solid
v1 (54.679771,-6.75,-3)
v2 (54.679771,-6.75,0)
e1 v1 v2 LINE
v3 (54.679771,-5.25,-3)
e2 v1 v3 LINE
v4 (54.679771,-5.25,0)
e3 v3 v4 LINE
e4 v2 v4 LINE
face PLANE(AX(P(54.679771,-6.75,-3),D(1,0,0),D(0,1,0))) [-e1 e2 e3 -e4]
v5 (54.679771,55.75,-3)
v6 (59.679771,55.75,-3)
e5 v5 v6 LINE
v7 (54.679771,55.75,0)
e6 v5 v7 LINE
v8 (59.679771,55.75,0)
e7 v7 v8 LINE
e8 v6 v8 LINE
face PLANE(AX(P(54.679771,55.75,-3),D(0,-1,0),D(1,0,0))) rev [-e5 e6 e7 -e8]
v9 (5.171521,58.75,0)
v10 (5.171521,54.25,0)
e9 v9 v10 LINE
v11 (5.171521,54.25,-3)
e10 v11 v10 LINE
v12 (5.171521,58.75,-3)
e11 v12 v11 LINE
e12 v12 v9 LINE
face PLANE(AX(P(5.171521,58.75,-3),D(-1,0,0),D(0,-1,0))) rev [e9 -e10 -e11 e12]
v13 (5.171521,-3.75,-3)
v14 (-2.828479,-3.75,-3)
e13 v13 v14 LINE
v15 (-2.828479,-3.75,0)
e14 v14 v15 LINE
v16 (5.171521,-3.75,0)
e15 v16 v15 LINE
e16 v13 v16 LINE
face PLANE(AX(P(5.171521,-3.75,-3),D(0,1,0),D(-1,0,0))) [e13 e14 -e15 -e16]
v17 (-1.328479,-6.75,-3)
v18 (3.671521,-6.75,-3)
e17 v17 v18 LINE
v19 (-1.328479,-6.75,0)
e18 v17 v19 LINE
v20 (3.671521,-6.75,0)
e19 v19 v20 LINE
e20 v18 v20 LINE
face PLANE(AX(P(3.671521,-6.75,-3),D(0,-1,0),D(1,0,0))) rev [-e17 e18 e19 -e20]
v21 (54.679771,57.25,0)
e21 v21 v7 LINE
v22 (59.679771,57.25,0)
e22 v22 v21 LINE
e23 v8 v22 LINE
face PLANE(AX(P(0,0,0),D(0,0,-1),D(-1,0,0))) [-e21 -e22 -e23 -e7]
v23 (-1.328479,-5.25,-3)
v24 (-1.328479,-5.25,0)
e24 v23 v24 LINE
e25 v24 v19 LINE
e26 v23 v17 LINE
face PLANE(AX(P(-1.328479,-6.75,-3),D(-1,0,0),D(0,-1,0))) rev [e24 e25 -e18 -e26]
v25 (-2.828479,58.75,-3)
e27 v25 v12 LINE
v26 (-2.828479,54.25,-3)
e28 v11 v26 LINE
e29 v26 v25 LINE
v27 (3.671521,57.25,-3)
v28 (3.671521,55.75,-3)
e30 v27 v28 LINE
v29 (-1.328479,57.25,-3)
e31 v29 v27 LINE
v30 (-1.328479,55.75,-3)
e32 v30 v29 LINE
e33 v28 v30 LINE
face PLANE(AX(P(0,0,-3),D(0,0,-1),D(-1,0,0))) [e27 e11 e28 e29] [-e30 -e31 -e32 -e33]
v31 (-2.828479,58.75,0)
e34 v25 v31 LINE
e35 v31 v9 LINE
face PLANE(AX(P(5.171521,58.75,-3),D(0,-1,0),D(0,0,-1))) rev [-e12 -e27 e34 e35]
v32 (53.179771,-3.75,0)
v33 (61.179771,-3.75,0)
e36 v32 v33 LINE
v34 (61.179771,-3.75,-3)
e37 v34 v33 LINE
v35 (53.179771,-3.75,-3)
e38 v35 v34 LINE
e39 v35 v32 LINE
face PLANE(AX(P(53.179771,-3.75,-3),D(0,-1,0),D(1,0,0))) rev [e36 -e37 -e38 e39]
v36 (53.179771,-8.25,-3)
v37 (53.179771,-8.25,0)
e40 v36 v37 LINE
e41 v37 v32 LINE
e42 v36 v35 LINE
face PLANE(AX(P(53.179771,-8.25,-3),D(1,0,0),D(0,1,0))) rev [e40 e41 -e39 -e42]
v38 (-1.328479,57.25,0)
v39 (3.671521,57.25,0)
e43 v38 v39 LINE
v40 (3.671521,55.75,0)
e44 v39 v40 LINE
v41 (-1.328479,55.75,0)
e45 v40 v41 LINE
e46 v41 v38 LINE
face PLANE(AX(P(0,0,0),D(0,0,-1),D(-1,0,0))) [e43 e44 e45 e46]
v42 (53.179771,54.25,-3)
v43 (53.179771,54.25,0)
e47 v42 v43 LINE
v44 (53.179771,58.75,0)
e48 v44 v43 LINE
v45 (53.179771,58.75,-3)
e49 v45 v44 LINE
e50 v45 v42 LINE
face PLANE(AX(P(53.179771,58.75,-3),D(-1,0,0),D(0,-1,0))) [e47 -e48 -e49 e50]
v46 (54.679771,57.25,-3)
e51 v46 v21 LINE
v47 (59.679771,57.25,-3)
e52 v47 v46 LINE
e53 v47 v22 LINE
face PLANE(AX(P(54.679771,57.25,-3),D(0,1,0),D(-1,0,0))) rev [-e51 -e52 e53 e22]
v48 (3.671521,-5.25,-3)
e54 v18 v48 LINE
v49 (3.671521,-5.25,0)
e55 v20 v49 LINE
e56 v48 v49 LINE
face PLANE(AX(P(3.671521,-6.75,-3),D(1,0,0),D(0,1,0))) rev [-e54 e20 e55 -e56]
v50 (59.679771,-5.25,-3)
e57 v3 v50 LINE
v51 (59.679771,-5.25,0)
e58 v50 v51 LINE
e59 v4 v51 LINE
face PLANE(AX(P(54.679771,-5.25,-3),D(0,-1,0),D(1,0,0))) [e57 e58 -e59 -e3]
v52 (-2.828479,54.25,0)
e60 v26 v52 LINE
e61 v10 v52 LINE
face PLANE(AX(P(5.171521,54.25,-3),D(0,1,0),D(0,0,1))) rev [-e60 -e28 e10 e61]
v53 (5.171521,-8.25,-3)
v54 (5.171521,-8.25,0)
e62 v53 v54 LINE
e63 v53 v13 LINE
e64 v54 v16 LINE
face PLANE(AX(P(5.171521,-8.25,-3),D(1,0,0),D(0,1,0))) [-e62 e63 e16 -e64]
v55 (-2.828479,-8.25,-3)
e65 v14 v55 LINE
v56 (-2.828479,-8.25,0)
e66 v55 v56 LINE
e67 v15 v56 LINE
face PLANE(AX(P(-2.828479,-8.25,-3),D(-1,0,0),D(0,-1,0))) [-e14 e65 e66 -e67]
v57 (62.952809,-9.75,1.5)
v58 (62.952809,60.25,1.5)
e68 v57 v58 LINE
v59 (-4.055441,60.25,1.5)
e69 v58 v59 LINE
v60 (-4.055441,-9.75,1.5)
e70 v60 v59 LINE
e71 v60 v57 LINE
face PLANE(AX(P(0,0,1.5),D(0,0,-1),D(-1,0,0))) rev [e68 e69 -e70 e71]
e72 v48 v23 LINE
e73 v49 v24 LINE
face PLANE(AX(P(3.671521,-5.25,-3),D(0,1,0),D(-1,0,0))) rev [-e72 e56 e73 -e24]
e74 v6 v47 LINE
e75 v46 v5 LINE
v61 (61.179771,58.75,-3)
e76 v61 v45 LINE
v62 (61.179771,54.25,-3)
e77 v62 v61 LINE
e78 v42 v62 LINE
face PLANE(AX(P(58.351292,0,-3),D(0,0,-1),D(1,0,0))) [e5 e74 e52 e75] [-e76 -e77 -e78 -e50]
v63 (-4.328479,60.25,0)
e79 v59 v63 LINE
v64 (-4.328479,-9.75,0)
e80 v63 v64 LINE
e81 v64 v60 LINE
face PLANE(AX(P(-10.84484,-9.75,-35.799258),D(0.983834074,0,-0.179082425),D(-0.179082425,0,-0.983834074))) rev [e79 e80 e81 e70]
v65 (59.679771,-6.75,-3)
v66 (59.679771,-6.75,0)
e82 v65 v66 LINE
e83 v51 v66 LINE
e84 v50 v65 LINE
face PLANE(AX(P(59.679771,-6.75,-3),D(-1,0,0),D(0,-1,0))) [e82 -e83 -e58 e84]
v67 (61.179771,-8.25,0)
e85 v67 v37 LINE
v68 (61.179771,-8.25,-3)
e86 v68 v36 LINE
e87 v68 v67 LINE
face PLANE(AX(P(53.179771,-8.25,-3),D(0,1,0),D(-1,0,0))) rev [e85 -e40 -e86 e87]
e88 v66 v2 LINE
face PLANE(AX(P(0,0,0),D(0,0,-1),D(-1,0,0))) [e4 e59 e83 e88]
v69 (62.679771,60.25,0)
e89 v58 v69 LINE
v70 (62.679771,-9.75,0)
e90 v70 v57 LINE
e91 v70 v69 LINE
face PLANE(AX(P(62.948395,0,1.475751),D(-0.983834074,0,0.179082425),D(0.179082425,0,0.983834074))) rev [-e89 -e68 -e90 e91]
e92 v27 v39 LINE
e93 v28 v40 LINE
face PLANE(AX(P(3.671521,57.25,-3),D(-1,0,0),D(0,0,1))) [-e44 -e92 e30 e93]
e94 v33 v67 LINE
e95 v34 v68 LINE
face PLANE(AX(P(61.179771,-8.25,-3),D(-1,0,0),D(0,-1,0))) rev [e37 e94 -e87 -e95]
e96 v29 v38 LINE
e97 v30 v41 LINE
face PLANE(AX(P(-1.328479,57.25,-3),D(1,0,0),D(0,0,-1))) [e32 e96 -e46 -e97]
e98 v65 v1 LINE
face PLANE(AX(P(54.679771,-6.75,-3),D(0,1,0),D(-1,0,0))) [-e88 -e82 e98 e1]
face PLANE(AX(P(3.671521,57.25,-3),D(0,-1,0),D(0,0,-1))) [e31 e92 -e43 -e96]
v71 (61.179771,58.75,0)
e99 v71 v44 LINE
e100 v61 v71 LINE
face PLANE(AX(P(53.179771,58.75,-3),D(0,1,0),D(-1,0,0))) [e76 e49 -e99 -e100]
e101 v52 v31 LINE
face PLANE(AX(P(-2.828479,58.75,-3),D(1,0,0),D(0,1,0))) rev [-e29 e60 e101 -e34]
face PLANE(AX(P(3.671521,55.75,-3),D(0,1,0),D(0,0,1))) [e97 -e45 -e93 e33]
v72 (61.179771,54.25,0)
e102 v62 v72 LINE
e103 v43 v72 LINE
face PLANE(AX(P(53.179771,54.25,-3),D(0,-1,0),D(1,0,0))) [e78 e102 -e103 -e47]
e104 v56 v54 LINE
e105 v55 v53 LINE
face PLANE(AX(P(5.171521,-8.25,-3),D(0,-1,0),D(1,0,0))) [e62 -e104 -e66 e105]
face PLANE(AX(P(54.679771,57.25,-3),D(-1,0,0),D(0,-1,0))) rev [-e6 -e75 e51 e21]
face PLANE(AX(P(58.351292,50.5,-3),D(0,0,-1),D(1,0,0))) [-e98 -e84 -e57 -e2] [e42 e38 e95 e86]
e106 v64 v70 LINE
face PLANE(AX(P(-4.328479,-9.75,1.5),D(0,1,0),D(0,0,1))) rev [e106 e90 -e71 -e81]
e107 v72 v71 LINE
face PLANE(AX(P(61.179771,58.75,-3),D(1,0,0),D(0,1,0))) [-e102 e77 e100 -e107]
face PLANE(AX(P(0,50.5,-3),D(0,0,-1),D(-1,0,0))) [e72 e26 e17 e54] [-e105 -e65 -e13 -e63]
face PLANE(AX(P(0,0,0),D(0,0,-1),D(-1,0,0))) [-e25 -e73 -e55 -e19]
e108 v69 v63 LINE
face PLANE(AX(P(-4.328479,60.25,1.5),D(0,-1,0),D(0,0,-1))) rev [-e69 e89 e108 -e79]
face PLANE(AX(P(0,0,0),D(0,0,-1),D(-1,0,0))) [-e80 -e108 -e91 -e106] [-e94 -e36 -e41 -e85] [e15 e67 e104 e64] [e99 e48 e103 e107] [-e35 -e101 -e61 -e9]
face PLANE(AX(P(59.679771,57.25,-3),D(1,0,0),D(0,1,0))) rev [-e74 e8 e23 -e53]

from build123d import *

# Parameters (mm, degrees)
SKETCH1_W                 = 67.008250425
SKETCH1_H                 = 70
BOSS_EXTRUDE1_DEPTH       = 1.5
BOSS_EXTRUDE2_START       = -9.75
BOSS_EXTRUDE2_DEPTH       = 70
CUT_EXTRUDE1_START        = -6
CUT_EXTRUDE1_OUTLINE_W    = 73
CUT_EXTRUDE1_OUTLINE_H    = 4
CUT_EXTRUDE1_DEPTH        = 1.741494861
SKETCH4_W                 = 8
SKETCH4_H                 = 4.5
SKETCH4_W_2               = 5
SKETCH4_H_2               = 1.5
BOSS_EXTRUDE3_DEPTH       = 3
MIRROR2_COPY_1_SKETCH_W   = 8
MIRROR2_COPY_1_SKETCH_H   = 4.5
MIRROR2_COPY_1_SKETCH_W_2 = 5
MIRROR2_COPY_1_SKETCH_H_2 = 1.5
MIRROR2_COPY_1_DEPTH      = 3


with BuildPart() as part:
    # Sketch1 → Boss-Extrude1 (new body)
    with BuildSketch(Plane.XY):
        with Locations((29.175646202, 25.25)):
            Rectangle(SKETCH1_W, SKETCH1_H)
    extrude(amount=BOSS_EXTRUDE1_DEPTH)

    # Boss-Extrude2: read off the stored shape, not the designer's step
    # Boss-Extrude2 outline → Boss-Extrude2 (add)
    with BuildSketch(Plane(origin=(0, 0, 0), x_dir=(1, 0, 0), z_dir=(0, 1, 0)).offset(BOSS_EXTRUDE2_START)):
        Polygon((62.952808957, -1.5), (62.679771414, 0), (62.679771414, -1.5), align=None)
    extrude(amount=BOSS_EXTRUDE2_DEPTH)

    # Cut-Extrude1: read off the stored shape, not the designer's step
    # Cut-Extrude1 outline → Cut-Extrude1 (cut)
    with BuildSketch(Plane(origin=(0, 0, 0), x_dir=(0, 1, 0), z_dir=(0.9838340738940914, 0, -0.17908242528220206)).offset(CUT_EXTRUDE1_START)):
        with Locations((25.5, 0)):
            Rectangle(CUT_EXTRUDE1_OUTLINE_W, CUT_EXTRUDE1_OUTLINE_H)
    extrude(amount=CUT_EXTRUDE1_DEPTH, mode=Mode.SUBTRACT)

    # Sketch4 → Boss-Extrude3 (add)
    with BuildSketch(Plane(origin=(0, 0, 0), x_dir=(-1, 0, 0), z_dir=(0, 0, -1))):
        with Locations((-1.171520989, 56.5)):
            Rectangle(SKETCH4_W, SKETCH4_H)
        with Locations((-1.171520989, 56.5)):
            Rectangle(SKETCH4_W_2, SKETCH4_H_2, mode=Mode.SUBTRACT)
    boss_extrude3 = extrude(amount=BOSS_EXTRUDE3_DEPTH)

    # Mirror1: Boss-Extrude3 across plane
    add(boss_extrude3.mirror(Plane(origin=(29.175646202, 0, 0), x_dir=(0, 0, 1), z_dir=(1, 0, 0))))

    # Mirror2: Boss-Extrude3 across plane
    add(boss_extrude3.mirror(Plane(origin=(0, 25.25, 0), x_dir=(0, 0, 1), z_dir=(0, -1, 0))))

    # Mirror2 copy 1 sketch → Mirror2 copy 1 (add)
    with BuildSketch(Plane(origin=(58.351292403, 50.5, 0), x_dir=(1, 0, 0), z_dir=(0, 0, -1))):
        with Locations((-1.171520989, 56.5)):
            Rectangle(MIRROR2_COPY_1_SKETCH_W, MIRROR2_COPY_1_SKETCH_H)
        with Locations((-1.171520989, 56.5)):
            Rectangle(MIRROR2_COPY_1_SKETCH_W_2, MIRROR2_COPY_1_SKETCH_H_2, mode=Mode.SUBTRACT)
    extrude(amount=MIRROR2_COPY_1_DEPTH)


solid = part.part
